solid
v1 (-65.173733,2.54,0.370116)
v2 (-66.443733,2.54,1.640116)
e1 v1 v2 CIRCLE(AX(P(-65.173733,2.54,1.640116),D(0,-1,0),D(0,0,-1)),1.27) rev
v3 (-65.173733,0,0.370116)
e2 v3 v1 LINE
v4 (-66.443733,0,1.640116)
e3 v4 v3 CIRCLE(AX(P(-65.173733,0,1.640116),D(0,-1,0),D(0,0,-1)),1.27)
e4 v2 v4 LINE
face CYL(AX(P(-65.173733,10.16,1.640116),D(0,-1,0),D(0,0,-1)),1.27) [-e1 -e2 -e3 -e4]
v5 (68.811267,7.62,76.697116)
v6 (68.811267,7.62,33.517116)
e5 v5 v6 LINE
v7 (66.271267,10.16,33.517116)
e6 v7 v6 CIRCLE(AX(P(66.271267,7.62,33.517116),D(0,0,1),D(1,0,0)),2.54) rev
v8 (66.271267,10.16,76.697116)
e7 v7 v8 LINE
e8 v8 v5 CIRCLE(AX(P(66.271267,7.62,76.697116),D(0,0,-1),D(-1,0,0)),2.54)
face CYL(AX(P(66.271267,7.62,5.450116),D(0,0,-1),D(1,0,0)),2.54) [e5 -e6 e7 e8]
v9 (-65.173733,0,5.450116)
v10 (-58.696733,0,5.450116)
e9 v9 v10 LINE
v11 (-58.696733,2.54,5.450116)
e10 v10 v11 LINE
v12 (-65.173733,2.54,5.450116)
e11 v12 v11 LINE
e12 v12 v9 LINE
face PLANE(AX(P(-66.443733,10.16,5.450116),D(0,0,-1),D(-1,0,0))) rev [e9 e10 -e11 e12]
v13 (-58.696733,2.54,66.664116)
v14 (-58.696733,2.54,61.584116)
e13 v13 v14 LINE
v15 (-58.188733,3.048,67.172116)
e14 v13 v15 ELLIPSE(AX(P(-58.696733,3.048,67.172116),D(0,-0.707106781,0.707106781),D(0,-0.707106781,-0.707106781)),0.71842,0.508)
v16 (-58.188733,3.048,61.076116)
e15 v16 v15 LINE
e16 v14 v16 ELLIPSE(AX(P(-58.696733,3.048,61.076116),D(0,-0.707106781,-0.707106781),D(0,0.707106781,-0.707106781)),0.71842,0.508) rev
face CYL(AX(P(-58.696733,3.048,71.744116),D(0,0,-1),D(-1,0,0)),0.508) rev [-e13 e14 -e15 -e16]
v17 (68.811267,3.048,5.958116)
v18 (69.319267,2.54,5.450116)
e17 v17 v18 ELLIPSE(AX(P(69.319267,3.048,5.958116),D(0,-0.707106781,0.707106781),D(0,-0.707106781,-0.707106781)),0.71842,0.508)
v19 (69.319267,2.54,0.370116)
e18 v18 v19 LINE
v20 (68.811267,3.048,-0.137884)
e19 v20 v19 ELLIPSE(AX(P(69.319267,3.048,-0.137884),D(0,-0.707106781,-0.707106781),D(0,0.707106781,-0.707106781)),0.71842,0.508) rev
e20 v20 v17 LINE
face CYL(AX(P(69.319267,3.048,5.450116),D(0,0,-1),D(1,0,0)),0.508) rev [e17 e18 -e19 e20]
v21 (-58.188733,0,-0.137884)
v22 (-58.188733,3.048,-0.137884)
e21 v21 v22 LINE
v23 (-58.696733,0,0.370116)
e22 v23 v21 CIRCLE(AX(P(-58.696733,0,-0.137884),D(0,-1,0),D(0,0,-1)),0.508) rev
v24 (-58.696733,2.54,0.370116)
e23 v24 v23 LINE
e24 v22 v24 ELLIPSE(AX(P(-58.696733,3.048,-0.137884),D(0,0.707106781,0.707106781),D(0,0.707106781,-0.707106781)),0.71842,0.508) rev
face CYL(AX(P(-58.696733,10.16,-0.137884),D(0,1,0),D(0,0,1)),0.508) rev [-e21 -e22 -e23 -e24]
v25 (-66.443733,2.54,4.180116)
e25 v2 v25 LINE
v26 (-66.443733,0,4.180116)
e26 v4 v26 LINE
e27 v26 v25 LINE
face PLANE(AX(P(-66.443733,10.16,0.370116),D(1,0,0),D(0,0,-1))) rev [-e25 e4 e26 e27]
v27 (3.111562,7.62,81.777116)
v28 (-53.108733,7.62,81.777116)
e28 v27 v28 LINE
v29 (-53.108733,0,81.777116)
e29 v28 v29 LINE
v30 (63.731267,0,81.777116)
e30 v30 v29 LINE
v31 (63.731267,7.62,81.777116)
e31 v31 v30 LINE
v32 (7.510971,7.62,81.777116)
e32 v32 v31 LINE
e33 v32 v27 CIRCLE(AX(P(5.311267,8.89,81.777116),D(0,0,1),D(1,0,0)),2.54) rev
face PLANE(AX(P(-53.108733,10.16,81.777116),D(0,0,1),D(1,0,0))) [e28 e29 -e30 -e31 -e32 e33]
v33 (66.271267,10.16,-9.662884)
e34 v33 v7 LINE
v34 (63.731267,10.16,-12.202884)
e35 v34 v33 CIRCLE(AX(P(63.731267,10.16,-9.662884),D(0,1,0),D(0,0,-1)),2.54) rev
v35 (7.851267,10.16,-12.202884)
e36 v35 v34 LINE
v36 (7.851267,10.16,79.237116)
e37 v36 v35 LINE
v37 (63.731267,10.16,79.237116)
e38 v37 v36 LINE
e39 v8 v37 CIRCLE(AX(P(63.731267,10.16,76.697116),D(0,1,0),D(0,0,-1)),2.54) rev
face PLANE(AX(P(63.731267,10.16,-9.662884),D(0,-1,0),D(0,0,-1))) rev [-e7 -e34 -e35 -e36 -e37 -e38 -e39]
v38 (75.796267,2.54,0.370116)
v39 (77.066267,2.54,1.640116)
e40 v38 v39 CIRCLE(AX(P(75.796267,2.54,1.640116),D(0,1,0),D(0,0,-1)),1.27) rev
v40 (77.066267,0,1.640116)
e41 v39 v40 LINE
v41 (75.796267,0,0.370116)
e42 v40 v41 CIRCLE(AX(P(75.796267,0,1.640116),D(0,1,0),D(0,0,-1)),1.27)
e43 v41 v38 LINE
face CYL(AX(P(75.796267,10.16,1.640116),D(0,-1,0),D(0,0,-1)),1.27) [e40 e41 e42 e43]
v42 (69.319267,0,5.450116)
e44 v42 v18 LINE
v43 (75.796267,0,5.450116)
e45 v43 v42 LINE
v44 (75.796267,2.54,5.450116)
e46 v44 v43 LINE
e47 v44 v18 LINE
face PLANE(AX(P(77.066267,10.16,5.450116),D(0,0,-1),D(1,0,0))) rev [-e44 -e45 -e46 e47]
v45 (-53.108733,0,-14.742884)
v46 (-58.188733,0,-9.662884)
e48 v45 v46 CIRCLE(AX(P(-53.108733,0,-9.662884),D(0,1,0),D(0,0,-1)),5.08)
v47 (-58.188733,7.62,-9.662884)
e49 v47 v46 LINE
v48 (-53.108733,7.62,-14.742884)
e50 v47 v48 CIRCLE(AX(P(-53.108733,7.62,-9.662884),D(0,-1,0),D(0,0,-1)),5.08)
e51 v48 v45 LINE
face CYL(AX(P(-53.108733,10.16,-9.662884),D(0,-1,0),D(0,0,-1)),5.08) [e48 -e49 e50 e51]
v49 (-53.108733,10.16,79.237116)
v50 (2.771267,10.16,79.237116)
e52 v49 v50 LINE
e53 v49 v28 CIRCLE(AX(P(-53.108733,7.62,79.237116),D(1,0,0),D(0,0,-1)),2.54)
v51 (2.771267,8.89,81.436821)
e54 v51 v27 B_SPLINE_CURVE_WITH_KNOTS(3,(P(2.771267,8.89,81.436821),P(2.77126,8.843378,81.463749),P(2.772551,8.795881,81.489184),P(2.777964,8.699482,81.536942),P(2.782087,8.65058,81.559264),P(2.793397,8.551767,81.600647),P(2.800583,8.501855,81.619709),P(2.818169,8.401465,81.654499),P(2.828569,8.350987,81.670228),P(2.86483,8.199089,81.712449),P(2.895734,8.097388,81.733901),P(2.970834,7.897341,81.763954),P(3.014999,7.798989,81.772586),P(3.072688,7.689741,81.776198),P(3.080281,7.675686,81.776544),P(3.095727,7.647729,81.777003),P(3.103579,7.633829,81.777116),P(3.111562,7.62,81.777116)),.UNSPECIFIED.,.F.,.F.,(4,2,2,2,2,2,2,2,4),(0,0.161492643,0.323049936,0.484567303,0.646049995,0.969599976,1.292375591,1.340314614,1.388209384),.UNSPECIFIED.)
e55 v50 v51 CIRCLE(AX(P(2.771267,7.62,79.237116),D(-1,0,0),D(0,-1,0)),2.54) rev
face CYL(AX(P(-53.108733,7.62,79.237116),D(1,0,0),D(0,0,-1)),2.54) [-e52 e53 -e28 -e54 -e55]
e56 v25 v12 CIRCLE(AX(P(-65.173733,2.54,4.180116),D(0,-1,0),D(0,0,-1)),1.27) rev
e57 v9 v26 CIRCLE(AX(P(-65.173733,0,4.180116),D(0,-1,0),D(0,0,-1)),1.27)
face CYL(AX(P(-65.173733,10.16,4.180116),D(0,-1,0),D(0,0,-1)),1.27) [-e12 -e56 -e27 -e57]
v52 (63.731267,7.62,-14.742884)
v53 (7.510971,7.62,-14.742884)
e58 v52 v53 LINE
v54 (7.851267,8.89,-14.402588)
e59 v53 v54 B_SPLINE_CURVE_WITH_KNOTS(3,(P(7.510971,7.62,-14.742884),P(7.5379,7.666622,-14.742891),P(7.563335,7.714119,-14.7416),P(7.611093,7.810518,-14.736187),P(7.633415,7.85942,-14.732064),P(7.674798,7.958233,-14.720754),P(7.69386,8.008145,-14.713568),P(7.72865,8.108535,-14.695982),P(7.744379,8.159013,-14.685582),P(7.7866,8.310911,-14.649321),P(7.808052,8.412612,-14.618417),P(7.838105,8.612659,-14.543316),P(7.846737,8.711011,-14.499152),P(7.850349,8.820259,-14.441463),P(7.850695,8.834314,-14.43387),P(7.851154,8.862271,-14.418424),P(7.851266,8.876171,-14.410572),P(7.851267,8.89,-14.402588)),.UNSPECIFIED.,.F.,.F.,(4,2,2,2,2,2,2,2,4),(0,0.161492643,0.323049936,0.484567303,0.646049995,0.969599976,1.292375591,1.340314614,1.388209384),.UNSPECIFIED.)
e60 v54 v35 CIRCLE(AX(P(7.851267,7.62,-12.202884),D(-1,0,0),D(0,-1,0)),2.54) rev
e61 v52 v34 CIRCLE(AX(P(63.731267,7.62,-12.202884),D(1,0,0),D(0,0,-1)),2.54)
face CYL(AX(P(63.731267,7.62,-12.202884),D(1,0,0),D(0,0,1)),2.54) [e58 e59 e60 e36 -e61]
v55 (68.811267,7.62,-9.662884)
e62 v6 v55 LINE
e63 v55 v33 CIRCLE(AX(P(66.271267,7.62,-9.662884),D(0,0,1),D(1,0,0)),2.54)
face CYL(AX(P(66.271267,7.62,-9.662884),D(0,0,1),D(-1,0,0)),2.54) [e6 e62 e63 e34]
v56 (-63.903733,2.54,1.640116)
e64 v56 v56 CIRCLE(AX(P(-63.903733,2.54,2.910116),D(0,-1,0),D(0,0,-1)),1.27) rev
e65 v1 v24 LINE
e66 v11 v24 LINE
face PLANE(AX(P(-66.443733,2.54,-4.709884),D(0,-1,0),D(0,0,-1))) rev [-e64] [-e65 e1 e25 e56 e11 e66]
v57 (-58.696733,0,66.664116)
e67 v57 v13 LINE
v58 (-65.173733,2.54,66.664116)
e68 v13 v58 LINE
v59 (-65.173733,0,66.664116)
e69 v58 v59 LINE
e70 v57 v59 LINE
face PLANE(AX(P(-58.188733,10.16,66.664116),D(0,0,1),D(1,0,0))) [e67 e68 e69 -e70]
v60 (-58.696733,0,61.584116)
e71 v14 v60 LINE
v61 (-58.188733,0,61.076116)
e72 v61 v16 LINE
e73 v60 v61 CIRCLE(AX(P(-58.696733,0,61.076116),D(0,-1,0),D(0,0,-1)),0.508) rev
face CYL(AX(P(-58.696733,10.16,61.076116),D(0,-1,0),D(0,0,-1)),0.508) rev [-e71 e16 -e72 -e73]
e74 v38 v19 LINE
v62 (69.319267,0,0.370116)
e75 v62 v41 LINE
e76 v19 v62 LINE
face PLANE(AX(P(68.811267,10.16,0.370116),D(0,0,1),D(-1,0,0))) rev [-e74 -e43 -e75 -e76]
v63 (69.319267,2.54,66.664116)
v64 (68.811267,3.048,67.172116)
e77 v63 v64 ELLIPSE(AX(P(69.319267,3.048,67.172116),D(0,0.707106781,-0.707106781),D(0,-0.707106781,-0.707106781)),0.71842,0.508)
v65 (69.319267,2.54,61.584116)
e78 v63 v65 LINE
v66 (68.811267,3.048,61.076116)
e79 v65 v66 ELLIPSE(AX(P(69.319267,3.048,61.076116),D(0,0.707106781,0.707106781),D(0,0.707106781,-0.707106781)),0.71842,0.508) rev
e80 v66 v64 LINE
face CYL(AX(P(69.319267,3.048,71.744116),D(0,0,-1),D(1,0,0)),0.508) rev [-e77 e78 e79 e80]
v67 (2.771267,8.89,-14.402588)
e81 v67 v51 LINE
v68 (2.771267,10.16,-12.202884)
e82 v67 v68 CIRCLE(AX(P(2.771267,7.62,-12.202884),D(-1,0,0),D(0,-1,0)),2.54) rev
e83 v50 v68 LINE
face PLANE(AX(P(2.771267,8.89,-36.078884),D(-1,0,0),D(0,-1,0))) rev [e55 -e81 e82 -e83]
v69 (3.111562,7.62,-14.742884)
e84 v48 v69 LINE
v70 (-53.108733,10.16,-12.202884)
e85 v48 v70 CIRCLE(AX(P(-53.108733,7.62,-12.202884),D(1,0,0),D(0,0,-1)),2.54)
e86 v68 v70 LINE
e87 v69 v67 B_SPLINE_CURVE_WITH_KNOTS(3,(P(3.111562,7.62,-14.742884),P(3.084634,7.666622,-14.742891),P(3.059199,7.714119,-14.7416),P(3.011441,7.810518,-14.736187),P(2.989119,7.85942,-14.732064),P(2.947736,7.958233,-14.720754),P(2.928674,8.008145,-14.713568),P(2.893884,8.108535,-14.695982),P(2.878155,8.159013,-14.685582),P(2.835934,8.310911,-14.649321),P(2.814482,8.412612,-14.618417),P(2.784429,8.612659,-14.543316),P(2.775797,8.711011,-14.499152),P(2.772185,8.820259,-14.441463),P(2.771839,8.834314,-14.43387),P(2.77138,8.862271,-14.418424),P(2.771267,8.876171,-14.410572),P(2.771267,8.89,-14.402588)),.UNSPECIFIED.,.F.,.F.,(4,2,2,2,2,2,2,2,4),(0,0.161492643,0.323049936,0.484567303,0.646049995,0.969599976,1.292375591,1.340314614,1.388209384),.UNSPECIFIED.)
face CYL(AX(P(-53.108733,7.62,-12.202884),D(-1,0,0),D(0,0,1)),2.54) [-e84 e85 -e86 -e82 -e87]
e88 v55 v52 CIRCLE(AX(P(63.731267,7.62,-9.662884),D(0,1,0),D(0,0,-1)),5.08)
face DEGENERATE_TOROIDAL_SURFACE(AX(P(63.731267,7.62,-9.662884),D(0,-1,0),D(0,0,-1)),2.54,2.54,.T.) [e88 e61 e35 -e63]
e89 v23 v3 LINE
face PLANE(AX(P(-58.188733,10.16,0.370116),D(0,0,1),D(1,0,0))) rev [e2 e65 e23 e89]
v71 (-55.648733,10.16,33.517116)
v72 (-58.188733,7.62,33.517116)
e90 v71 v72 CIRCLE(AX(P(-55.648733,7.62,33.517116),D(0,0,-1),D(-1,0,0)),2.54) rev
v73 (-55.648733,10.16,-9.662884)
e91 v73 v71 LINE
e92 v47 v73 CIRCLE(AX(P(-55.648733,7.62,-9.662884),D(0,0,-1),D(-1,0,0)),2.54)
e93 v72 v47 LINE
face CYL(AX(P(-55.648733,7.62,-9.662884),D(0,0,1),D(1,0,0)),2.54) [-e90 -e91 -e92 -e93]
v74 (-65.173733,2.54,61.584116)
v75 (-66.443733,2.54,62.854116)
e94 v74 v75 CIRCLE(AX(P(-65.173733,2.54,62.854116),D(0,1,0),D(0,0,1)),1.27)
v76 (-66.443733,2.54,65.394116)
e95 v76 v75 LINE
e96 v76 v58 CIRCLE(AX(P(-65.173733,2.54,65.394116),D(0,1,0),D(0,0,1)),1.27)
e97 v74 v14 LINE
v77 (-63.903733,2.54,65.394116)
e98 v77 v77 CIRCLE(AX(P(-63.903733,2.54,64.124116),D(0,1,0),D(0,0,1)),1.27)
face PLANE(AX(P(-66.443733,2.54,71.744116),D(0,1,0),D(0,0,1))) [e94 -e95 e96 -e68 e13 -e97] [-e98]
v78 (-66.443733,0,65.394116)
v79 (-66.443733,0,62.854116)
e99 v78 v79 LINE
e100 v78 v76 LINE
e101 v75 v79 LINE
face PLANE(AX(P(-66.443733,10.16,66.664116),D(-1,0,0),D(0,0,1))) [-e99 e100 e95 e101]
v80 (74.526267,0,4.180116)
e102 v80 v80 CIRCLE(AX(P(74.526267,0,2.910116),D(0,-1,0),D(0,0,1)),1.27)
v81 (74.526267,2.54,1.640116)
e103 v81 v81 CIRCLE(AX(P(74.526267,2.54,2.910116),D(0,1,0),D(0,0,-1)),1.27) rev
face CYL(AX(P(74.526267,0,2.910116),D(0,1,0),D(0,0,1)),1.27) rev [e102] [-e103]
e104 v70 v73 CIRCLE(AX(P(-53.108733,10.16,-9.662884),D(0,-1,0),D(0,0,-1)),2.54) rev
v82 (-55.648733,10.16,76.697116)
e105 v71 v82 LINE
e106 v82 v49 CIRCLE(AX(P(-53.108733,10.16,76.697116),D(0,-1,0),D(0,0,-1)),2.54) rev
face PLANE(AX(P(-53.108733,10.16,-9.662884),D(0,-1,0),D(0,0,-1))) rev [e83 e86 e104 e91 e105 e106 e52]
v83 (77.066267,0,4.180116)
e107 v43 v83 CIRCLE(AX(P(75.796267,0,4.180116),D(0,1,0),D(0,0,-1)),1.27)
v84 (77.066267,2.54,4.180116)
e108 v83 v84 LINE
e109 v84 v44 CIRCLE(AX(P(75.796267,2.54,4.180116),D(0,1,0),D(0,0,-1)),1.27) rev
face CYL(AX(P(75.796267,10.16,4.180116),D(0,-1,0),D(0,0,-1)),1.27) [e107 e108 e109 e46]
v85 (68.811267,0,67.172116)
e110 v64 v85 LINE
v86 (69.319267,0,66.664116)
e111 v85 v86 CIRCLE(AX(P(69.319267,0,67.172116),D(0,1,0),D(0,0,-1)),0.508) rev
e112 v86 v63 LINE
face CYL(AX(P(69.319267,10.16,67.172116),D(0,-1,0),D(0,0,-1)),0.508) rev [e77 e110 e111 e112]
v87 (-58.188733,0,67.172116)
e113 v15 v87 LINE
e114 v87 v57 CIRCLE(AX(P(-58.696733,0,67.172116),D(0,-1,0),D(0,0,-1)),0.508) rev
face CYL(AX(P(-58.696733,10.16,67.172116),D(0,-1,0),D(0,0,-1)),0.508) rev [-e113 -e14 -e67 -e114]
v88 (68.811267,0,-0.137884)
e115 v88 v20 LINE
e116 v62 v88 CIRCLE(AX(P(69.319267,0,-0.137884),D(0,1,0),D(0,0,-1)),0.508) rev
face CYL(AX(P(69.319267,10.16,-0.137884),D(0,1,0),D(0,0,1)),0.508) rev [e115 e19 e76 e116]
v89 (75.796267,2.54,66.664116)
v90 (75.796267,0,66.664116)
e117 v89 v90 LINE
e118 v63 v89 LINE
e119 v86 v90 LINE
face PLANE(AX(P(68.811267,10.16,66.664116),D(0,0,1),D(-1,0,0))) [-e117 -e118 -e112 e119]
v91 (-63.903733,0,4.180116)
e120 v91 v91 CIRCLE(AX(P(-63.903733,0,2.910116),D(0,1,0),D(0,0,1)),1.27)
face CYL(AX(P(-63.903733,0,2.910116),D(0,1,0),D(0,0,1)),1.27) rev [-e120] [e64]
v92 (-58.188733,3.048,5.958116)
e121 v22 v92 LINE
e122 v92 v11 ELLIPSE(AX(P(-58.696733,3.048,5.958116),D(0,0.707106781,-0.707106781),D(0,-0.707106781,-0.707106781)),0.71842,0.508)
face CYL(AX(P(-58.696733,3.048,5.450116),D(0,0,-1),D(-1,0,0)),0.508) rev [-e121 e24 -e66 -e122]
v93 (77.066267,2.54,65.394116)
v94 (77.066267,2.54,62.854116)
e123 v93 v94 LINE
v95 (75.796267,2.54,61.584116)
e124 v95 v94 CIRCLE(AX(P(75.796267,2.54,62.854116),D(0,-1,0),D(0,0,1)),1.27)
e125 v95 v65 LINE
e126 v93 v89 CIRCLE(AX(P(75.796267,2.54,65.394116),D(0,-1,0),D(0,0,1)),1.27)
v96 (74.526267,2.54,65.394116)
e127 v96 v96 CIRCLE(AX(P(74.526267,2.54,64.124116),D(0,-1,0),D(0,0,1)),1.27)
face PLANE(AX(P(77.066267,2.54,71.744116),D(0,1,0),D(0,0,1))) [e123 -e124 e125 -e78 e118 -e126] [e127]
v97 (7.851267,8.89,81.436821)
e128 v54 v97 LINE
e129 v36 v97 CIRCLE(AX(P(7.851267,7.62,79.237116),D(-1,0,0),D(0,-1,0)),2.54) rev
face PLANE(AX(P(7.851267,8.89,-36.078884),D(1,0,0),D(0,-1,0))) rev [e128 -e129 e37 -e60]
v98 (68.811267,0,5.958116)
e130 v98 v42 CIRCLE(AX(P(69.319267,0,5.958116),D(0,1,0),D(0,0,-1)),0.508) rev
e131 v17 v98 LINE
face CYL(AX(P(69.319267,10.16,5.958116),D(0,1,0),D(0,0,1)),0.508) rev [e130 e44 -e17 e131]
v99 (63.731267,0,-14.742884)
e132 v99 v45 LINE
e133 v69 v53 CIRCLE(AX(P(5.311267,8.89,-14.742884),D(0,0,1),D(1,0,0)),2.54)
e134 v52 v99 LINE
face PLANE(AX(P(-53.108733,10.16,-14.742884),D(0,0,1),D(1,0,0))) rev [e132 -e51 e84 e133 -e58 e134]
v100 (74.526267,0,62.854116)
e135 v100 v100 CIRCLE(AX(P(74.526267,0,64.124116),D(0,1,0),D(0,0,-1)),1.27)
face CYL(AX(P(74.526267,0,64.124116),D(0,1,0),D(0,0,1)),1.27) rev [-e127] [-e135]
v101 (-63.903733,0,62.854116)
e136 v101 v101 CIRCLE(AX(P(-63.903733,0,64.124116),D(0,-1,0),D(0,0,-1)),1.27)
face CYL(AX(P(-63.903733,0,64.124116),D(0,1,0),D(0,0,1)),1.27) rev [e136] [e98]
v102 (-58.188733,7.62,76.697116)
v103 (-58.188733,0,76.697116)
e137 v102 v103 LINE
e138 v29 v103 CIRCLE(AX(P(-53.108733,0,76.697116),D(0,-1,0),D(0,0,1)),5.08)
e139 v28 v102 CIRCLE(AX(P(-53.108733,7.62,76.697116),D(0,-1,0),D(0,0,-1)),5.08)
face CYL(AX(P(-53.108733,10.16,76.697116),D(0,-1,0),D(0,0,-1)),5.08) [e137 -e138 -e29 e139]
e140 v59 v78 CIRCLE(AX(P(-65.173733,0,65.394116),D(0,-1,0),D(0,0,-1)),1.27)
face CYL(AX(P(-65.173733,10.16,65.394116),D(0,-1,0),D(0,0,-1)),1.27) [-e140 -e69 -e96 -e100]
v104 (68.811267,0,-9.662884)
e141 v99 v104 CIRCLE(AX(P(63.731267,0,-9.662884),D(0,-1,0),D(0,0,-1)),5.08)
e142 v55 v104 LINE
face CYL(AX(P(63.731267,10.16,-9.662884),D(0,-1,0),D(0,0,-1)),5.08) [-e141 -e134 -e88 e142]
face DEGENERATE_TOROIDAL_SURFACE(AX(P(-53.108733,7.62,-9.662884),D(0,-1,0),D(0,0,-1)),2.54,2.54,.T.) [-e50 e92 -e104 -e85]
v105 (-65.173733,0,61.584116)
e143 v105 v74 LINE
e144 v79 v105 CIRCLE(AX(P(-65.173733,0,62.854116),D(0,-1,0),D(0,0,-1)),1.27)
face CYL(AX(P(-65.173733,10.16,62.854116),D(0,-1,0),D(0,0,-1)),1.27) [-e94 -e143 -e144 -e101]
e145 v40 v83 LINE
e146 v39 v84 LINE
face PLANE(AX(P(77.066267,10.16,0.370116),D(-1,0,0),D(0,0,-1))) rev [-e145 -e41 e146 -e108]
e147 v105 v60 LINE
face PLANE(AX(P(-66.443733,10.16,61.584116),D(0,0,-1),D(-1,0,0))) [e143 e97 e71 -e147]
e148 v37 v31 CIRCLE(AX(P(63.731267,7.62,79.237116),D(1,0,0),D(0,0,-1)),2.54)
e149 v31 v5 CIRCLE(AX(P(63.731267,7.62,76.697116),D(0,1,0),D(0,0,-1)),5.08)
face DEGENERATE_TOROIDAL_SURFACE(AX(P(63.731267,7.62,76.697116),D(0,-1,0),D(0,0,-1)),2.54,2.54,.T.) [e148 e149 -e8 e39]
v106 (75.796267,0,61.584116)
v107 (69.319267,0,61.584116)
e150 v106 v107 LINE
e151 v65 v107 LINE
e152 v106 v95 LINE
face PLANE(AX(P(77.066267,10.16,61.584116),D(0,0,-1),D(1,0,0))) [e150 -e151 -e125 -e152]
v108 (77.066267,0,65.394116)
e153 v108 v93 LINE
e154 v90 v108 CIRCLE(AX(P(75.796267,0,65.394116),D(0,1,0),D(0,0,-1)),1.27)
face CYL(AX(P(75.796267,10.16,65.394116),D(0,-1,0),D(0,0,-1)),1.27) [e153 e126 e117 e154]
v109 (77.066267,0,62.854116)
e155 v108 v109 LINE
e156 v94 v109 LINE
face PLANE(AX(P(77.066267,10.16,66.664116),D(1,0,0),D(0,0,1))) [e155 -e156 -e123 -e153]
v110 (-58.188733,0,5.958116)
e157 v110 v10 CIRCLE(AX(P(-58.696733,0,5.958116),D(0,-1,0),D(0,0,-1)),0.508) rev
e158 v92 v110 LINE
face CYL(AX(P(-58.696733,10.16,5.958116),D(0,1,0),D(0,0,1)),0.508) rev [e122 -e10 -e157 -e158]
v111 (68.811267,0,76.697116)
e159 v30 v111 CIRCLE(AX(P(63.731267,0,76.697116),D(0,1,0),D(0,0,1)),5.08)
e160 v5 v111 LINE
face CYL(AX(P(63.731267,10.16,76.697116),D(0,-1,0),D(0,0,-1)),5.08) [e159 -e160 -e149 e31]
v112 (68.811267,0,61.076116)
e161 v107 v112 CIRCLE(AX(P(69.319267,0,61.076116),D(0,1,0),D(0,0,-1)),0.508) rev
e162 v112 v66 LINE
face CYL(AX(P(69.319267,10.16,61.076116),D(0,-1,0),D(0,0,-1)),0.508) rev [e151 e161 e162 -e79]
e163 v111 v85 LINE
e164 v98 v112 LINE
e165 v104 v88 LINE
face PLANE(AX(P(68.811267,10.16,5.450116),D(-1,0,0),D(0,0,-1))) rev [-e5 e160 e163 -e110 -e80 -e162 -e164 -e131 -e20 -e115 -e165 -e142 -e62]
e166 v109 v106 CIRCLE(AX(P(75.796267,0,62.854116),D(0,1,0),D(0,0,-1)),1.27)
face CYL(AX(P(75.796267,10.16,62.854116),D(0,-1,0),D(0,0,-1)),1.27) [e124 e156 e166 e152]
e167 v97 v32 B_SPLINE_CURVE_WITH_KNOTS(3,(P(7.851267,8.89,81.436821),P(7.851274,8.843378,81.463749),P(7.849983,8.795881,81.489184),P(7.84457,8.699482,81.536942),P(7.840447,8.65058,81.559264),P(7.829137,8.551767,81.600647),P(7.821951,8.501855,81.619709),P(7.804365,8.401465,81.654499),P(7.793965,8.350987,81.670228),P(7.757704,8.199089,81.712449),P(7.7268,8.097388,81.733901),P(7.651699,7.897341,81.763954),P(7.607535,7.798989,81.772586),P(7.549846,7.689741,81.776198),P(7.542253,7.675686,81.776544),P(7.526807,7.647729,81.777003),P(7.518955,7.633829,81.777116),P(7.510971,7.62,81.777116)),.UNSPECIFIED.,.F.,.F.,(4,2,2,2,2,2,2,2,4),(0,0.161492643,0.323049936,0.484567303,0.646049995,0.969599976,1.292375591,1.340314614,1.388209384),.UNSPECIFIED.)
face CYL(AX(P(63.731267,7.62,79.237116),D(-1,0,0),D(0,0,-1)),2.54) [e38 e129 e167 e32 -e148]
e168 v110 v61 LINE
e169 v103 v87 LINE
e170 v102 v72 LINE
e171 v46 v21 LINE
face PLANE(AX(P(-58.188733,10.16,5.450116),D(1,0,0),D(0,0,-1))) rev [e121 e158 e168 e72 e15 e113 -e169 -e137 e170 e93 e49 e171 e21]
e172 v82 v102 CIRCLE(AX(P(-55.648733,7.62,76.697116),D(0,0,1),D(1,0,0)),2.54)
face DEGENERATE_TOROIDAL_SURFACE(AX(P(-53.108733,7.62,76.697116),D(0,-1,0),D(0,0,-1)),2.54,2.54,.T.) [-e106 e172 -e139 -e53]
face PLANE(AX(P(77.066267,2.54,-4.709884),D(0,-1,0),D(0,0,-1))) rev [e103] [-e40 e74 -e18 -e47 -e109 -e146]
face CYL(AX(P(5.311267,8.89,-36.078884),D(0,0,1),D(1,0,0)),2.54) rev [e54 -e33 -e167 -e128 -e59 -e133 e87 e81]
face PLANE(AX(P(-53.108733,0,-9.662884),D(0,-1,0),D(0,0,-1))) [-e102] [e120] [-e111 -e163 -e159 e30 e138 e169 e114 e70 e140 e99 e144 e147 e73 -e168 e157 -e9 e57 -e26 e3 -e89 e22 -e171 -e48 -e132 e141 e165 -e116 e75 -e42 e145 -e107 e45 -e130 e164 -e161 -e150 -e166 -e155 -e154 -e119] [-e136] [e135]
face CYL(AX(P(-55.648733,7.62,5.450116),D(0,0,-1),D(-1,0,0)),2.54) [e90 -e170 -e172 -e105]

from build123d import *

# Parameters (mm, degrees)
BOSS_EXTRUDE1_DEPTH  = 10.16
SKETCH3_R            = 1.27
CUT_EXTRUDE1_DEPTH   = 10.16
SKETCH4_W            = 8.255
SKETCH4_H            = 7.62
CUT_EXTRUDE2_DEPTH   = 10.16
CUT_EXTRUDE3_DEPTH   = 69.596
FILLET1_R            = 2.54
FILLET2_R            = 0.508
FILLET3_R            = 1.27
FILLET1_OF_MIRROR3_R = 2.54
FILLET2_OF_MIRROR3_R = 0.508
FILLET3_OF_MIRROR3_R = 1.27


# Read off the part's stored shape, not the designer's step: Mirror4
with BuildPart() as part:
    # Sketch1 → Boss-Extrude1 (new body)
    with BuildSketch(Plane(origin=(0, 0, 0), x_dir=(1, 0, 0), z_dir=(0, 1, 0))):
        with BuildLine():
            Line((-58.188733064, -33.517116066), (5.311266936, -33.517116066))
            Line((5.311266936, -33.517116066), (5.311266936, 14.742883934))
            Line((5.311266936, 14.742883934), (-53.108733064, 14.742883934))
            ThreePointArc((-53.108733064, 14.742883934), (-56.700835512, 13.254986382), (-58.188733064, 9.662883934))
            Line((-58.188733064, 9.662883934), (-58.188733064, -0.370116066))
            Line((-58.188733064, -0.370116066), (-66.443733064, -0.370116066))
            Line((-66.443733064, -0.370116066), (-66.443733064, -5.450116066))
            Line((-66.443733064, -5.450116066), (-58.188733064, -5.450116066))
            Line((-58.188733064, -5.450116066), (-58.188733064, -33.517116066))
        make_face()
    boss_extrude1 = extrude(amount=BOSS_EXTRUDE1_DEPTH)

    # Sketch3 → Cut-Extrude1 (cut)
    with BuildSketch(Plane(origin=(0, 10.16, 0), x_dir=(1, 0, 0), z_dir=(0, 1, 0))):
        with Locations(Location((-63.903733064, -2.910116066, 0), (0, 0, 270))):
            Circle(SKETCH3_R)
    cut_extrude1 = extrude(amount=-CUT_EXTRUDE1_DEPTH, mode=Mode.SUBTRACT)

    # Sketch4 → Cut-Extrude2 (cut)
    with BuildSketch(Plane.XY.offset(5.450116066)):
        with Locations((-62.316233064, 6.35)):
            Rectangle(SKETCH4_W, SKETCH4_H)
    cut_extrude2 = extrude(amount=-CUT_EXTRUDE2_DEPTH, mode=Mode.SUBTRACT)

    # Sketch5 → Cut-Extrude3 (cut)
    with BuildSketch(Plane.XY.offset(33.517116066)):
        with BuildLine():
            Line((5.311266936, 10.16), (5.311266936, 8.89))
            Line((5.311266936, 8.89), (5.311266936, 6.35))
            ThreePointArc((5.311266936, 6.35), (3.515215712, 7.093948776), (2.771266936, 8.89))
            Line((2.771266936, 8.89), (2.771266936, 10.16))
            Line((2.771266936, 10.16), (5.311266936, 10.16))
        make_face()
    cut_extrude3 = extrude(amount=-CUT_EXTRUDE3_DEPTH, mode=Mode.SUBTRACT)

    # Fillet1
    fillet1_edges = [part.edges().sort_by_distance(p)[0] for p in [
        (-25.168733064, 10.16, -14.742883934),
        (-56.700835512, 10.16, -13.254986382),
        (-58.188733064, 10.16, 11.927116066),
    ]]
    fillet(fillet1_edges, radius=FILLET1_R)

    # Fillet2
    fillet2_edges = [part.edges().sort_by_distance(p)[0] for p in [
        (-58.188733064, 1.27, 5.450116066),
        (-58.188733064, 1.27, 0.370116066),
        (-58.188733064, 2.54, 2.910116066),
    ]]
    fillet(fillet2_edges, radius=FILLET2_R)

    # Fillet3
    fillet3_edges = [part.edges().sort_by_distance(p)[0] for p in [
        (-66.443733064, 1.27, 5.450116066),
        (-66.443733064, 1.27, 0.370116066),
    ]]
    fillet(fillet3_edges, radius=FILLET3_R)

    # Mirror3: Boss-Extrude1, Cut-Extrude1, Cut-Extrude2, Cut-Extrude3 across plane
    add(boss_extrude1.mirror(Plane(origin=(-58.188733064, 10.16, 33.517116066), x_dir=(1, 0, 0), z_dir=(0, 0, -1))))
    add(cut_extrude1.mirror(Plane(origin=(-58.188733064, 10.16, 33.517116066), x_dir=(1, 0, 0), z_dir=(0, 0, -1))), mode=Mode.SUBTRACT)
    add(cut_extrude2.mirror(Plane(origin=(-58.188733064, 10.16, 33.517116066), x_dir=(1, 0, 0), z_dir=(0, 0, -1))), mode=Mode.SUBTRACT)
    add(cut_extrude3.mirror(Plane(origin=(-58.188733064, 10.16, 33.517116066), x_dir=(1, 0, 0), z_dir=(0, 0, -1))), mode=Mode.SUBTRACT)

    # Fillet1 of Mirror3
    fillet1_of_mirror3_edges = [part.edges().sort_by_distance(p)[0] for p in [
        (-25.168733064, 10.16, 81.777116066),
        (-56.700835512, 10.16, 80.289218515),
        (-58.188733064, 10.16, 55.107116066),
    ]]
    fillet(fillet1_of_mirror3_edges, radius=FILLET1_OF_MIRROR3_R)

    # Fillet2 of Mirror3
    fillet2_of_mirror3_edges = [part.edges().sort_by_distance(p)[0] for p in [
        (-58.188733064, 1.27, 61.584116066),
        (-58.188733064, 1.27, 66.664116066),
        (-58.188733064, 2.54, 64.124116066),
    ]]
    fillet(fillet2_of_mirror3_edges, radius=FILLET2_OF_MIRROR3_R)

    # Fillet3 of Mirror3
    fillet3_of_mirror3_edges = [part.edges().sort_by_distance(p)[0] for p in [
        (-66.443733064, 1.27, 61.584116066),
        (-66.443733064, 1.27, 66.664116066),
    ]]
    fillet(fillet3_of_mirror3_edges, radius=FILLET3_OF_MIRROR3_R)

    # Mirror4: part across plane


with BuildPart() as part_1:
    add(part.part)
    add(part.part.mirror(Plane(origin=(5.311266936, 10.16, -14.742883934), x_dir=(0, 0, 1), z_dir=(-1, 0, 0))))


solid = part_1.part
